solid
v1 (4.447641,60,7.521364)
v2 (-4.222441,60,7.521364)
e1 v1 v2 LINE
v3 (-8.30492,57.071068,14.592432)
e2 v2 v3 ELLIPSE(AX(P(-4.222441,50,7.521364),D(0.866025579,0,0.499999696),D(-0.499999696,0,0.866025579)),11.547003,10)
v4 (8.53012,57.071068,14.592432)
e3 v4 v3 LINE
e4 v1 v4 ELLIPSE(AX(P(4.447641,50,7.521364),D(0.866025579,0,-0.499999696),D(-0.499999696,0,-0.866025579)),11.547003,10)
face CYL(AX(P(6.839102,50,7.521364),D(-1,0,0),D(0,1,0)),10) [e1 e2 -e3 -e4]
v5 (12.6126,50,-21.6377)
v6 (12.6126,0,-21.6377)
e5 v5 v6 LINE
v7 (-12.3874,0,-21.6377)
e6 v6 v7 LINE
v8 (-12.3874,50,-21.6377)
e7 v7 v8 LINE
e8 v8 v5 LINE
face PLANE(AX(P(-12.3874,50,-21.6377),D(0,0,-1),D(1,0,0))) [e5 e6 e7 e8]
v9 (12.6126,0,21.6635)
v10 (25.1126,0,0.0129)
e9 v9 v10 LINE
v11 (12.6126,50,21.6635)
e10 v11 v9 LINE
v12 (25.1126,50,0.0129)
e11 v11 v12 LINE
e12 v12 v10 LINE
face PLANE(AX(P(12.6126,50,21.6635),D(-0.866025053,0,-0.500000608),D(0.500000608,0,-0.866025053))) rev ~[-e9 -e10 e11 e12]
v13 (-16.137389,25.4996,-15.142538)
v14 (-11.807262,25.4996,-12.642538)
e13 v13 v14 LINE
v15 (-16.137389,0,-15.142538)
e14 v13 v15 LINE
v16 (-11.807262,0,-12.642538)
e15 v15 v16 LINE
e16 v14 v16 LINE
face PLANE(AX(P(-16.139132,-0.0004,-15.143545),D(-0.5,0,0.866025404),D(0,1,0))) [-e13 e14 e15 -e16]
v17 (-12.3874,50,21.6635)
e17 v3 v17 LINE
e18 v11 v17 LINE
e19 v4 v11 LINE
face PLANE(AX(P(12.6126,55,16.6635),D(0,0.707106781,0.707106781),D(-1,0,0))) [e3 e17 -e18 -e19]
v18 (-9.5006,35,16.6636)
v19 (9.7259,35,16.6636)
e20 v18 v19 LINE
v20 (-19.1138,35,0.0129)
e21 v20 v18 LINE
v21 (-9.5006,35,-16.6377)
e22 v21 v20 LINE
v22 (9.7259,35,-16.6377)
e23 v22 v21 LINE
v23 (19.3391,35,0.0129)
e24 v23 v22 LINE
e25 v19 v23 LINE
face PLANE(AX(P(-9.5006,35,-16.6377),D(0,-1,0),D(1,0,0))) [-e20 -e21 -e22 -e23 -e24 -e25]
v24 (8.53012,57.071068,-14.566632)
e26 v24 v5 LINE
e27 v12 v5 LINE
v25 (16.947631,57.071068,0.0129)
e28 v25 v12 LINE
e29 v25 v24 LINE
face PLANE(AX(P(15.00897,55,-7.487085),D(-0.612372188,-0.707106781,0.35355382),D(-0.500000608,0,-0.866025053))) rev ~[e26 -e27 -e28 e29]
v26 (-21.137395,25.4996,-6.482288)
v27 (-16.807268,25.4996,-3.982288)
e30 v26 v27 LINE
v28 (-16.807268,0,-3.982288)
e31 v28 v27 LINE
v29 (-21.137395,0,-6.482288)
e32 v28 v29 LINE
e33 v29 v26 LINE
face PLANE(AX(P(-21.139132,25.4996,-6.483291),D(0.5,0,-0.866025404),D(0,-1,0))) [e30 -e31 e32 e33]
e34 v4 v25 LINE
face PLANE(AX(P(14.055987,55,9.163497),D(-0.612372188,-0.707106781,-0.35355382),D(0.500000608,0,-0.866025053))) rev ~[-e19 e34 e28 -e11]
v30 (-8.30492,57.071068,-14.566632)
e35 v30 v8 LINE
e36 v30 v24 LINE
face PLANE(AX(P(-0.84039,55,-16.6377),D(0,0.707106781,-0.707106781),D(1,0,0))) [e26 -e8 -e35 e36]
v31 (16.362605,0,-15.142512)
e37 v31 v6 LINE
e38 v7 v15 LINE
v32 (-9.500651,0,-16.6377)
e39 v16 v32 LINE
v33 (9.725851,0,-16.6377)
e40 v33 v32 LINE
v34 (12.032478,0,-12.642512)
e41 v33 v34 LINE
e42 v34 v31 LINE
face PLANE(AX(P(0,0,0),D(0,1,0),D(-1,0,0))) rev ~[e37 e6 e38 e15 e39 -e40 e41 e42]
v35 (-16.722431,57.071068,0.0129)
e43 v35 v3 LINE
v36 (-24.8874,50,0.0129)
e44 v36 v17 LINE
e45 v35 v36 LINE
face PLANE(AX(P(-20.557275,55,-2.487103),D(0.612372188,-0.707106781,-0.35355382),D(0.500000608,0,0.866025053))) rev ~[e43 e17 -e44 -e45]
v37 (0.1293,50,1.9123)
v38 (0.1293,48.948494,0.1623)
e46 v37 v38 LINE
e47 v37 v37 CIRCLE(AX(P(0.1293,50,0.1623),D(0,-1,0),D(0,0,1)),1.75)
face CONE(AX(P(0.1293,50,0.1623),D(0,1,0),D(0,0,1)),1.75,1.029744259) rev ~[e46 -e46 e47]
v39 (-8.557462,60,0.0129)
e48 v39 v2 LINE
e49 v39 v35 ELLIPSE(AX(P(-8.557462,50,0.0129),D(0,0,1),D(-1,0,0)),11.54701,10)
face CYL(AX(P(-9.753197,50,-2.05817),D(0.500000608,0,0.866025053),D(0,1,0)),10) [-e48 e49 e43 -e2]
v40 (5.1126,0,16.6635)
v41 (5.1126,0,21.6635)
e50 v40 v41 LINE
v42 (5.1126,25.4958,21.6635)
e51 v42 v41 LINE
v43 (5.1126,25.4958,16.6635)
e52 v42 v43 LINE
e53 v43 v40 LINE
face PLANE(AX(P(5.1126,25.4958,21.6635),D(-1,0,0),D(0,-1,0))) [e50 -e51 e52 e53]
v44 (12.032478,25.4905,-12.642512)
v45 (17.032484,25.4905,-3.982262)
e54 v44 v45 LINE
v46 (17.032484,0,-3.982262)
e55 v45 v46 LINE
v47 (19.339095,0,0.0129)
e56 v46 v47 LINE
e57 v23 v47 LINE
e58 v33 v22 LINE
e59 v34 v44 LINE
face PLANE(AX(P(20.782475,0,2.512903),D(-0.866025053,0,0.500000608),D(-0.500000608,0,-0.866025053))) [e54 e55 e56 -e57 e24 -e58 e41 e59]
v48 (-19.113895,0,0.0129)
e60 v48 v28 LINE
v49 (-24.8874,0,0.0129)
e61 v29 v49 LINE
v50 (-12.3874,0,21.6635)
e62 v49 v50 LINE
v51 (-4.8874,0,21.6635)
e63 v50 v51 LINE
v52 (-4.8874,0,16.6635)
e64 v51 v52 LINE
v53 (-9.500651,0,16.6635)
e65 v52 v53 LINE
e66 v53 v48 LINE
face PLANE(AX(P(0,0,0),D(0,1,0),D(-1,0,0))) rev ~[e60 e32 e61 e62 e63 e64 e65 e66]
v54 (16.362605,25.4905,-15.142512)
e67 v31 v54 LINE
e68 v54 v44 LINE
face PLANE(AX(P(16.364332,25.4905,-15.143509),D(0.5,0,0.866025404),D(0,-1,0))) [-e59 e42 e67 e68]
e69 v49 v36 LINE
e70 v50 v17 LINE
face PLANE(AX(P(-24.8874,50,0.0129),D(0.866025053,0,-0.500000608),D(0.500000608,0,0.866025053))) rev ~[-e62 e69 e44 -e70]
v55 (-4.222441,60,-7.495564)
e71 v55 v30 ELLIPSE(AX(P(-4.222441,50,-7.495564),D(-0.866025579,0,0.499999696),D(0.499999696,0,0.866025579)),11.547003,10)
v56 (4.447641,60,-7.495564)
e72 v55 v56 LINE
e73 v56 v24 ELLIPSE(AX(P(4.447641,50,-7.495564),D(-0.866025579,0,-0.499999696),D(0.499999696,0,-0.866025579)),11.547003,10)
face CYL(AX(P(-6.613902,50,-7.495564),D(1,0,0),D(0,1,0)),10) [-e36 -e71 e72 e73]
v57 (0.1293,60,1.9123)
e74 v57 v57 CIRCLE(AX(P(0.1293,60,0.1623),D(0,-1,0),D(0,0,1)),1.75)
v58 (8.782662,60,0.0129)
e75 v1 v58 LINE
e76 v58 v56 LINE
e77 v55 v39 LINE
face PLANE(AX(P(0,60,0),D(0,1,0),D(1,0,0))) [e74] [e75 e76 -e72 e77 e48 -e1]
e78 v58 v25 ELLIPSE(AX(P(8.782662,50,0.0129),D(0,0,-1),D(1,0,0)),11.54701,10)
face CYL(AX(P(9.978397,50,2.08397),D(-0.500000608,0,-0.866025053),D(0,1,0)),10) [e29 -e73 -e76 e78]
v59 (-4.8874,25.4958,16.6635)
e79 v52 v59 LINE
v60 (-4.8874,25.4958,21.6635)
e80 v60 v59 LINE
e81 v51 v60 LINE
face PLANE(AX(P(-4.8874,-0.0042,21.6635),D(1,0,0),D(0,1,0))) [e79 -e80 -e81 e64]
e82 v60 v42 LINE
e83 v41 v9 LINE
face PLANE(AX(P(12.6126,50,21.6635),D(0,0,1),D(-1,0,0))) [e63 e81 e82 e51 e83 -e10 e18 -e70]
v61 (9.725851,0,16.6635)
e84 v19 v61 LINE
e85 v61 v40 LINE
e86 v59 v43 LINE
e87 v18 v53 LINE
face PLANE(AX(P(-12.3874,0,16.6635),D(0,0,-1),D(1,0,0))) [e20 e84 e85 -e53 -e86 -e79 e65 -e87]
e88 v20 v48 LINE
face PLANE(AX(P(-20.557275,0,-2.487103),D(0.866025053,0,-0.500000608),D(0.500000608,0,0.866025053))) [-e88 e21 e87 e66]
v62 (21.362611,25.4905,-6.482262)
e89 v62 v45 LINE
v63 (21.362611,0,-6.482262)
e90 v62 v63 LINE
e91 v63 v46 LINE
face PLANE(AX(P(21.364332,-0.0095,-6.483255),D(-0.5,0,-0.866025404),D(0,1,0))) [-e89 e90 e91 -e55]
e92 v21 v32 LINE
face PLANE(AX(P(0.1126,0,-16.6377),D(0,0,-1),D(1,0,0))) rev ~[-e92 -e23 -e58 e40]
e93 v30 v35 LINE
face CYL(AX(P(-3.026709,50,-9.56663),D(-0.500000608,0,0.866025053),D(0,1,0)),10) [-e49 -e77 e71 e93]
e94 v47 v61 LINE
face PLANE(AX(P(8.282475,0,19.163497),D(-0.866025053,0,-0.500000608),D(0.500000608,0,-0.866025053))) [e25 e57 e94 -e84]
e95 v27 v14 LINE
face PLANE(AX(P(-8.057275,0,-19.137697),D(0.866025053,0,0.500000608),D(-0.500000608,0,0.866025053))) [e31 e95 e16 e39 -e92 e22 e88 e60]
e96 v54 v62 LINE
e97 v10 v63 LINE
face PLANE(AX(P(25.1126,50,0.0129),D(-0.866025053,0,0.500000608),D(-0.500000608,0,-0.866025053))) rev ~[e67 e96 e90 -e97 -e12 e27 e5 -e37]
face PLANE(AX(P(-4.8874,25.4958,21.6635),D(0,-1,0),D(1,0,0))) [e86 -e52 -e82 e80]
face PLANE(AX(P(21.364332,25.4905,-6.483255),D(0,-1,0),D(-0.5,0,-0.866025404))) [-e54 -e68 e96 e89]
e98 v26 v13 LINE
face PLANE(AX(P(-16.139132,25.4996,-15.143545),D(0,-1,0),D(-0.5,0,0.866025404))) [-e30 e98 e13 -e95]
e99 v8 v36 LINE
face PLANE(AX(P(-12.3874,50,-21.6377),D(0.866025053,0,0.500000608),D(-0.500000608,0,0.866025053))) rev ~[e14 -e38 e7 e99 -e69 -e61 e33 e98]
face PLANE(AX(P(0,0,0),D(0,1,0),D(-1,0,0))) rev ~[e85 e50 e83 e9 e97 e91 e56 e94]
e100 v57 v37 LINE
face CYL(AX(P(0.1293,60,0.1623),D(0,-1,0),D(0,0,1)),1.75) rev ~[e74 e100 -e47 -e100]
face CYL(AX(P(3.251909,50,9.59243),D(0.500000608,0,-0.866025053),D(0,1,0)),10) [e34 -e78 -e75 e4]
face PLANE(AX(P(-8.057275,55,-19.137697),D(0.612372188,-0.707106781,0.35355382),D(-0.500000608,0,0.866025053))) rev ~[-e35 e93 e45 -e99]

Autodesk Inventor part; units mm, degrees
ref_plane "YZ Plane" through (0, 0, 0) normal (1, 0, 0) x (0, 1, 0)
ref_plane "XZ Plane" through (0, 0, 0) normal (0, 1, 0) x (-1, 0, 0)
ref_plane "XY Plane" through (0, 0, 0) normal (0, 0, 1) x (1, 0, 0)
sketch "Sketch2" plane through (0, 0, 0) normal (0, 1, 0) x (-1, 0, 0)
  line L0 (-0.1126, -21.6377) -> (12.3874, -21.6377)
  line L1 (-0.1126, -21.6377) -> (-12.6126, -21.6377)
  line L2 (12.3874, -21.6377) -> (24.8874, 0.0129)
  line L3 (24.8874, 0.0129) -> (12.3874, 21.6635)
  line L4 (12.3874, 21.6635) -> (-12.6126, 21.6635)
  line L5 (-12.6126, 21.6635) -> (-25.1126, 0.0129)
  line L6 (-25.1126, 0.0129) -> (-12.6126, -21.6377)
  point P0 (0, 0)
  dimension "d12" = 12.5
  dimension "d13" = 12.5
  dimension "d14" = 25
  dimension "d15" = 25
  dimension "d16" = 120
  dimension "d17" = 25
  dimension "d18" = 25
  dimension "d19" = 120
extrude "Extrusion2" add sketch "Sketch2" along normal blind 50
shell "Shell1" thickness 5 removed faces 1 at (0.1126, 0, 7.2298)
sketch "Sketch3" plane through (-12.3874, 0, 21.6635) normal (0, 0, 1) x (1, 0, 0)
  line L0 (7.5, 25.4958) -> (17.5, 25.4958)
  line L1 (17.5, 25.4958) -> (17.5, -0.0042)
  line L2 (17.5, -0.0042) -> (7.5, -0.0042)
  line L3 (7.5, -0.0042) -> (7.5, 25.4958)
  line L4 (0, 0) -> (0, 50) projected
  point P0 (12.3874, 0)
  dimension "d23" = 25.5
  dimension "d24" = 10
  dimension "d25" = 7.5
extrude "Extrusion3" cut sketch "Sketch3" against normal blind 5
sketch "Sketch4" plane through (12.6126, 0, -21.6377) normal (0.8660254, 0, -0.5) x (-0.5, 0, -0.8660254)
  line L0 (-17.5, 25.4905) -> (-7.5, 25.4905)
  line L1 (-7.5, 25.4905) -> (-7.5, -0.0095)
  line L2 (-7.5, -0.0095) -> (-17.5, -0.0095)
  line L3 (-17.5, -0.0095) -> (-17.5, 25.4905)
  line L4 (-25, 0) -> (-25, 50) projected
  point P0 (-12.4325, 0)
  point P1 (12.3874, 0)
  dimension "d28" = 25.5
  dimension "d29" = 10
  dimension "d30" = 7.5
extrude "Extrusion4" cut sketch "Sketch4" against normal blind 5
sketch "Sketch5" plane through (-24.8874, 0, 0.0129) normal (-0.8660254, 0, -0.5) x (-0.5, 0, 0.8660254)
  line L0 (-17.5, 25.4996) -> (-7.5, 25.4996)
  line L1 (-7.5, 25.4996) -> (-7.5, -0.0004)
  line L2 (-7.5, -0.0004) -> (-17.5, -0.0004)
  line L3 (-17.5, -0.0004) -> (-17.5, 25.4996)
  line L4 (-25, 0) -> (-25, 50) projected
  point P0 (-12.4549, 0)
  point P1 (12.3874, 0)
  dimension "d33" = 25.5
  dimension "d34" = 10
  dimension "d35" = 7.5
extrude "Extrusion5" cut sketch "Sketch5" against normal blind 5
sketch "Sketch7" plane through (0, 50, 0) normal (0, 1, 0) x (1, 0, 0)
  circle A0 centre (0, 0) radius 13.5
  dimension "d39" = 27
extrude "Extrusion6" add sketch "Sketch7" along normal blind 10 and the other way blind 15
sketch "Sketch11" plane through (-9.5006, 45, -16.6377) normal (0, -1, 0) x (1, 0, 0)
  line L0 (-9.6132, 16.6506) -> (0, 33.3013) projected
  line L1 (0, 33.3013) -> (19.2265, 33.3013) projected
  line L2 (0, 33.3013) -> (19.2265, 33.3013)
  line L3 (19.2265, 33.3013) -> (28.8397, 16.6506) projected
  line L4 (19.2265, 33.3013) -> (28.8397, 16.6506)
  line L5 (28.8397, 16.6506) -> (19.2265, 0) projected
  line L6 (28.8397, 16.6506) -> (19.2265, 0)
  line L7 (19.2265, 0) -> (0, 0) projected
  line L8 (19.2265, 0) -> (0, 0)
  line L9 (0, 0) -> (-9.6132, 16.6506)
  line L10 (-9.6132, 16.6506) -> (0, 33.3013)
  point P0 (9.5006, 16.6377)
extrude "Extrusion8" add sketch "Sketch11" along normal blind 10
sketch "Sketch12" plane through (0, 50, 0) normal (0, 1, 0) x (1, 0, 0)
  line L0 (-12.3874, 21.6377) -> (-24.8874, -0.0129) projected
  line L1 (25.1126, -0.0129) -> (12.6126, 21.6377) projected
  line L2 (-12.3874, 21.6377) -> (12.6126, 21.6377)
  line L3 (12.6126, 21.6377) -> (25.1126, -0.0129)
  line L4 (12.6126, -21.6635) -> (25.1126, -0.0129) projected
  line L5 (25.1126, -0.0129) -> (12.6126, -21.6635)
  line L6 (12.6126, -21.6635) -> (-12.3874, -21.6635)
  line L7 (-24.8874, -0.0129) -> (-12.3874, -21.6635) projected
  line L8 (-12.3874, -21.6635) -> (-24.8874, -0.0129)
  line L9 (-24.8874, -0.0129) -> (-12.3874, 21.6377)
  point P0 (0, 0)
extrude "Extrusion9" add sketch "Sketch12" along normal blind 10
chamfer "Chamfer1" distance 10 angle 45 1 edges at (0.1126, 60, 21.6635)
chamfer "Chamfer2" distance 10 angle 45 1 edges at (21.7494, 60, 5.8382)
chamfer "Chamfer3" distance 10 angle 45 1 edges at (-21.5241, 60, 5.8382)
chamfer "Chamfer4" distance 10 angle 45 1 edges at (-15.7506, 60, -15.8124)
chamfer "Chamfer5" distance 10 angle 45 1 edges at (5.8861, 60, -21.6377)
chamfer "Chamfer6" distance 10 angle 45 1 edges at (18.8626, 60, -10.8124)
fillet "Fillet9" radius 10 6 edges at (10.2024, 60, 5.8382) (10.2024, 60, -5.8124) (0.1126, 60, -11.6377) (-9.9771, 60, -5.8124) (-9.9771, 60, 5.8382) (0.1126, 60, 11.6635)
hole "Hole2" at (0.1293, 60, 0.1623) direction (0, -1, 0) diameter 3.5 depth 10 tip angle 118
properties part number "center" material "ABS Plastic"
